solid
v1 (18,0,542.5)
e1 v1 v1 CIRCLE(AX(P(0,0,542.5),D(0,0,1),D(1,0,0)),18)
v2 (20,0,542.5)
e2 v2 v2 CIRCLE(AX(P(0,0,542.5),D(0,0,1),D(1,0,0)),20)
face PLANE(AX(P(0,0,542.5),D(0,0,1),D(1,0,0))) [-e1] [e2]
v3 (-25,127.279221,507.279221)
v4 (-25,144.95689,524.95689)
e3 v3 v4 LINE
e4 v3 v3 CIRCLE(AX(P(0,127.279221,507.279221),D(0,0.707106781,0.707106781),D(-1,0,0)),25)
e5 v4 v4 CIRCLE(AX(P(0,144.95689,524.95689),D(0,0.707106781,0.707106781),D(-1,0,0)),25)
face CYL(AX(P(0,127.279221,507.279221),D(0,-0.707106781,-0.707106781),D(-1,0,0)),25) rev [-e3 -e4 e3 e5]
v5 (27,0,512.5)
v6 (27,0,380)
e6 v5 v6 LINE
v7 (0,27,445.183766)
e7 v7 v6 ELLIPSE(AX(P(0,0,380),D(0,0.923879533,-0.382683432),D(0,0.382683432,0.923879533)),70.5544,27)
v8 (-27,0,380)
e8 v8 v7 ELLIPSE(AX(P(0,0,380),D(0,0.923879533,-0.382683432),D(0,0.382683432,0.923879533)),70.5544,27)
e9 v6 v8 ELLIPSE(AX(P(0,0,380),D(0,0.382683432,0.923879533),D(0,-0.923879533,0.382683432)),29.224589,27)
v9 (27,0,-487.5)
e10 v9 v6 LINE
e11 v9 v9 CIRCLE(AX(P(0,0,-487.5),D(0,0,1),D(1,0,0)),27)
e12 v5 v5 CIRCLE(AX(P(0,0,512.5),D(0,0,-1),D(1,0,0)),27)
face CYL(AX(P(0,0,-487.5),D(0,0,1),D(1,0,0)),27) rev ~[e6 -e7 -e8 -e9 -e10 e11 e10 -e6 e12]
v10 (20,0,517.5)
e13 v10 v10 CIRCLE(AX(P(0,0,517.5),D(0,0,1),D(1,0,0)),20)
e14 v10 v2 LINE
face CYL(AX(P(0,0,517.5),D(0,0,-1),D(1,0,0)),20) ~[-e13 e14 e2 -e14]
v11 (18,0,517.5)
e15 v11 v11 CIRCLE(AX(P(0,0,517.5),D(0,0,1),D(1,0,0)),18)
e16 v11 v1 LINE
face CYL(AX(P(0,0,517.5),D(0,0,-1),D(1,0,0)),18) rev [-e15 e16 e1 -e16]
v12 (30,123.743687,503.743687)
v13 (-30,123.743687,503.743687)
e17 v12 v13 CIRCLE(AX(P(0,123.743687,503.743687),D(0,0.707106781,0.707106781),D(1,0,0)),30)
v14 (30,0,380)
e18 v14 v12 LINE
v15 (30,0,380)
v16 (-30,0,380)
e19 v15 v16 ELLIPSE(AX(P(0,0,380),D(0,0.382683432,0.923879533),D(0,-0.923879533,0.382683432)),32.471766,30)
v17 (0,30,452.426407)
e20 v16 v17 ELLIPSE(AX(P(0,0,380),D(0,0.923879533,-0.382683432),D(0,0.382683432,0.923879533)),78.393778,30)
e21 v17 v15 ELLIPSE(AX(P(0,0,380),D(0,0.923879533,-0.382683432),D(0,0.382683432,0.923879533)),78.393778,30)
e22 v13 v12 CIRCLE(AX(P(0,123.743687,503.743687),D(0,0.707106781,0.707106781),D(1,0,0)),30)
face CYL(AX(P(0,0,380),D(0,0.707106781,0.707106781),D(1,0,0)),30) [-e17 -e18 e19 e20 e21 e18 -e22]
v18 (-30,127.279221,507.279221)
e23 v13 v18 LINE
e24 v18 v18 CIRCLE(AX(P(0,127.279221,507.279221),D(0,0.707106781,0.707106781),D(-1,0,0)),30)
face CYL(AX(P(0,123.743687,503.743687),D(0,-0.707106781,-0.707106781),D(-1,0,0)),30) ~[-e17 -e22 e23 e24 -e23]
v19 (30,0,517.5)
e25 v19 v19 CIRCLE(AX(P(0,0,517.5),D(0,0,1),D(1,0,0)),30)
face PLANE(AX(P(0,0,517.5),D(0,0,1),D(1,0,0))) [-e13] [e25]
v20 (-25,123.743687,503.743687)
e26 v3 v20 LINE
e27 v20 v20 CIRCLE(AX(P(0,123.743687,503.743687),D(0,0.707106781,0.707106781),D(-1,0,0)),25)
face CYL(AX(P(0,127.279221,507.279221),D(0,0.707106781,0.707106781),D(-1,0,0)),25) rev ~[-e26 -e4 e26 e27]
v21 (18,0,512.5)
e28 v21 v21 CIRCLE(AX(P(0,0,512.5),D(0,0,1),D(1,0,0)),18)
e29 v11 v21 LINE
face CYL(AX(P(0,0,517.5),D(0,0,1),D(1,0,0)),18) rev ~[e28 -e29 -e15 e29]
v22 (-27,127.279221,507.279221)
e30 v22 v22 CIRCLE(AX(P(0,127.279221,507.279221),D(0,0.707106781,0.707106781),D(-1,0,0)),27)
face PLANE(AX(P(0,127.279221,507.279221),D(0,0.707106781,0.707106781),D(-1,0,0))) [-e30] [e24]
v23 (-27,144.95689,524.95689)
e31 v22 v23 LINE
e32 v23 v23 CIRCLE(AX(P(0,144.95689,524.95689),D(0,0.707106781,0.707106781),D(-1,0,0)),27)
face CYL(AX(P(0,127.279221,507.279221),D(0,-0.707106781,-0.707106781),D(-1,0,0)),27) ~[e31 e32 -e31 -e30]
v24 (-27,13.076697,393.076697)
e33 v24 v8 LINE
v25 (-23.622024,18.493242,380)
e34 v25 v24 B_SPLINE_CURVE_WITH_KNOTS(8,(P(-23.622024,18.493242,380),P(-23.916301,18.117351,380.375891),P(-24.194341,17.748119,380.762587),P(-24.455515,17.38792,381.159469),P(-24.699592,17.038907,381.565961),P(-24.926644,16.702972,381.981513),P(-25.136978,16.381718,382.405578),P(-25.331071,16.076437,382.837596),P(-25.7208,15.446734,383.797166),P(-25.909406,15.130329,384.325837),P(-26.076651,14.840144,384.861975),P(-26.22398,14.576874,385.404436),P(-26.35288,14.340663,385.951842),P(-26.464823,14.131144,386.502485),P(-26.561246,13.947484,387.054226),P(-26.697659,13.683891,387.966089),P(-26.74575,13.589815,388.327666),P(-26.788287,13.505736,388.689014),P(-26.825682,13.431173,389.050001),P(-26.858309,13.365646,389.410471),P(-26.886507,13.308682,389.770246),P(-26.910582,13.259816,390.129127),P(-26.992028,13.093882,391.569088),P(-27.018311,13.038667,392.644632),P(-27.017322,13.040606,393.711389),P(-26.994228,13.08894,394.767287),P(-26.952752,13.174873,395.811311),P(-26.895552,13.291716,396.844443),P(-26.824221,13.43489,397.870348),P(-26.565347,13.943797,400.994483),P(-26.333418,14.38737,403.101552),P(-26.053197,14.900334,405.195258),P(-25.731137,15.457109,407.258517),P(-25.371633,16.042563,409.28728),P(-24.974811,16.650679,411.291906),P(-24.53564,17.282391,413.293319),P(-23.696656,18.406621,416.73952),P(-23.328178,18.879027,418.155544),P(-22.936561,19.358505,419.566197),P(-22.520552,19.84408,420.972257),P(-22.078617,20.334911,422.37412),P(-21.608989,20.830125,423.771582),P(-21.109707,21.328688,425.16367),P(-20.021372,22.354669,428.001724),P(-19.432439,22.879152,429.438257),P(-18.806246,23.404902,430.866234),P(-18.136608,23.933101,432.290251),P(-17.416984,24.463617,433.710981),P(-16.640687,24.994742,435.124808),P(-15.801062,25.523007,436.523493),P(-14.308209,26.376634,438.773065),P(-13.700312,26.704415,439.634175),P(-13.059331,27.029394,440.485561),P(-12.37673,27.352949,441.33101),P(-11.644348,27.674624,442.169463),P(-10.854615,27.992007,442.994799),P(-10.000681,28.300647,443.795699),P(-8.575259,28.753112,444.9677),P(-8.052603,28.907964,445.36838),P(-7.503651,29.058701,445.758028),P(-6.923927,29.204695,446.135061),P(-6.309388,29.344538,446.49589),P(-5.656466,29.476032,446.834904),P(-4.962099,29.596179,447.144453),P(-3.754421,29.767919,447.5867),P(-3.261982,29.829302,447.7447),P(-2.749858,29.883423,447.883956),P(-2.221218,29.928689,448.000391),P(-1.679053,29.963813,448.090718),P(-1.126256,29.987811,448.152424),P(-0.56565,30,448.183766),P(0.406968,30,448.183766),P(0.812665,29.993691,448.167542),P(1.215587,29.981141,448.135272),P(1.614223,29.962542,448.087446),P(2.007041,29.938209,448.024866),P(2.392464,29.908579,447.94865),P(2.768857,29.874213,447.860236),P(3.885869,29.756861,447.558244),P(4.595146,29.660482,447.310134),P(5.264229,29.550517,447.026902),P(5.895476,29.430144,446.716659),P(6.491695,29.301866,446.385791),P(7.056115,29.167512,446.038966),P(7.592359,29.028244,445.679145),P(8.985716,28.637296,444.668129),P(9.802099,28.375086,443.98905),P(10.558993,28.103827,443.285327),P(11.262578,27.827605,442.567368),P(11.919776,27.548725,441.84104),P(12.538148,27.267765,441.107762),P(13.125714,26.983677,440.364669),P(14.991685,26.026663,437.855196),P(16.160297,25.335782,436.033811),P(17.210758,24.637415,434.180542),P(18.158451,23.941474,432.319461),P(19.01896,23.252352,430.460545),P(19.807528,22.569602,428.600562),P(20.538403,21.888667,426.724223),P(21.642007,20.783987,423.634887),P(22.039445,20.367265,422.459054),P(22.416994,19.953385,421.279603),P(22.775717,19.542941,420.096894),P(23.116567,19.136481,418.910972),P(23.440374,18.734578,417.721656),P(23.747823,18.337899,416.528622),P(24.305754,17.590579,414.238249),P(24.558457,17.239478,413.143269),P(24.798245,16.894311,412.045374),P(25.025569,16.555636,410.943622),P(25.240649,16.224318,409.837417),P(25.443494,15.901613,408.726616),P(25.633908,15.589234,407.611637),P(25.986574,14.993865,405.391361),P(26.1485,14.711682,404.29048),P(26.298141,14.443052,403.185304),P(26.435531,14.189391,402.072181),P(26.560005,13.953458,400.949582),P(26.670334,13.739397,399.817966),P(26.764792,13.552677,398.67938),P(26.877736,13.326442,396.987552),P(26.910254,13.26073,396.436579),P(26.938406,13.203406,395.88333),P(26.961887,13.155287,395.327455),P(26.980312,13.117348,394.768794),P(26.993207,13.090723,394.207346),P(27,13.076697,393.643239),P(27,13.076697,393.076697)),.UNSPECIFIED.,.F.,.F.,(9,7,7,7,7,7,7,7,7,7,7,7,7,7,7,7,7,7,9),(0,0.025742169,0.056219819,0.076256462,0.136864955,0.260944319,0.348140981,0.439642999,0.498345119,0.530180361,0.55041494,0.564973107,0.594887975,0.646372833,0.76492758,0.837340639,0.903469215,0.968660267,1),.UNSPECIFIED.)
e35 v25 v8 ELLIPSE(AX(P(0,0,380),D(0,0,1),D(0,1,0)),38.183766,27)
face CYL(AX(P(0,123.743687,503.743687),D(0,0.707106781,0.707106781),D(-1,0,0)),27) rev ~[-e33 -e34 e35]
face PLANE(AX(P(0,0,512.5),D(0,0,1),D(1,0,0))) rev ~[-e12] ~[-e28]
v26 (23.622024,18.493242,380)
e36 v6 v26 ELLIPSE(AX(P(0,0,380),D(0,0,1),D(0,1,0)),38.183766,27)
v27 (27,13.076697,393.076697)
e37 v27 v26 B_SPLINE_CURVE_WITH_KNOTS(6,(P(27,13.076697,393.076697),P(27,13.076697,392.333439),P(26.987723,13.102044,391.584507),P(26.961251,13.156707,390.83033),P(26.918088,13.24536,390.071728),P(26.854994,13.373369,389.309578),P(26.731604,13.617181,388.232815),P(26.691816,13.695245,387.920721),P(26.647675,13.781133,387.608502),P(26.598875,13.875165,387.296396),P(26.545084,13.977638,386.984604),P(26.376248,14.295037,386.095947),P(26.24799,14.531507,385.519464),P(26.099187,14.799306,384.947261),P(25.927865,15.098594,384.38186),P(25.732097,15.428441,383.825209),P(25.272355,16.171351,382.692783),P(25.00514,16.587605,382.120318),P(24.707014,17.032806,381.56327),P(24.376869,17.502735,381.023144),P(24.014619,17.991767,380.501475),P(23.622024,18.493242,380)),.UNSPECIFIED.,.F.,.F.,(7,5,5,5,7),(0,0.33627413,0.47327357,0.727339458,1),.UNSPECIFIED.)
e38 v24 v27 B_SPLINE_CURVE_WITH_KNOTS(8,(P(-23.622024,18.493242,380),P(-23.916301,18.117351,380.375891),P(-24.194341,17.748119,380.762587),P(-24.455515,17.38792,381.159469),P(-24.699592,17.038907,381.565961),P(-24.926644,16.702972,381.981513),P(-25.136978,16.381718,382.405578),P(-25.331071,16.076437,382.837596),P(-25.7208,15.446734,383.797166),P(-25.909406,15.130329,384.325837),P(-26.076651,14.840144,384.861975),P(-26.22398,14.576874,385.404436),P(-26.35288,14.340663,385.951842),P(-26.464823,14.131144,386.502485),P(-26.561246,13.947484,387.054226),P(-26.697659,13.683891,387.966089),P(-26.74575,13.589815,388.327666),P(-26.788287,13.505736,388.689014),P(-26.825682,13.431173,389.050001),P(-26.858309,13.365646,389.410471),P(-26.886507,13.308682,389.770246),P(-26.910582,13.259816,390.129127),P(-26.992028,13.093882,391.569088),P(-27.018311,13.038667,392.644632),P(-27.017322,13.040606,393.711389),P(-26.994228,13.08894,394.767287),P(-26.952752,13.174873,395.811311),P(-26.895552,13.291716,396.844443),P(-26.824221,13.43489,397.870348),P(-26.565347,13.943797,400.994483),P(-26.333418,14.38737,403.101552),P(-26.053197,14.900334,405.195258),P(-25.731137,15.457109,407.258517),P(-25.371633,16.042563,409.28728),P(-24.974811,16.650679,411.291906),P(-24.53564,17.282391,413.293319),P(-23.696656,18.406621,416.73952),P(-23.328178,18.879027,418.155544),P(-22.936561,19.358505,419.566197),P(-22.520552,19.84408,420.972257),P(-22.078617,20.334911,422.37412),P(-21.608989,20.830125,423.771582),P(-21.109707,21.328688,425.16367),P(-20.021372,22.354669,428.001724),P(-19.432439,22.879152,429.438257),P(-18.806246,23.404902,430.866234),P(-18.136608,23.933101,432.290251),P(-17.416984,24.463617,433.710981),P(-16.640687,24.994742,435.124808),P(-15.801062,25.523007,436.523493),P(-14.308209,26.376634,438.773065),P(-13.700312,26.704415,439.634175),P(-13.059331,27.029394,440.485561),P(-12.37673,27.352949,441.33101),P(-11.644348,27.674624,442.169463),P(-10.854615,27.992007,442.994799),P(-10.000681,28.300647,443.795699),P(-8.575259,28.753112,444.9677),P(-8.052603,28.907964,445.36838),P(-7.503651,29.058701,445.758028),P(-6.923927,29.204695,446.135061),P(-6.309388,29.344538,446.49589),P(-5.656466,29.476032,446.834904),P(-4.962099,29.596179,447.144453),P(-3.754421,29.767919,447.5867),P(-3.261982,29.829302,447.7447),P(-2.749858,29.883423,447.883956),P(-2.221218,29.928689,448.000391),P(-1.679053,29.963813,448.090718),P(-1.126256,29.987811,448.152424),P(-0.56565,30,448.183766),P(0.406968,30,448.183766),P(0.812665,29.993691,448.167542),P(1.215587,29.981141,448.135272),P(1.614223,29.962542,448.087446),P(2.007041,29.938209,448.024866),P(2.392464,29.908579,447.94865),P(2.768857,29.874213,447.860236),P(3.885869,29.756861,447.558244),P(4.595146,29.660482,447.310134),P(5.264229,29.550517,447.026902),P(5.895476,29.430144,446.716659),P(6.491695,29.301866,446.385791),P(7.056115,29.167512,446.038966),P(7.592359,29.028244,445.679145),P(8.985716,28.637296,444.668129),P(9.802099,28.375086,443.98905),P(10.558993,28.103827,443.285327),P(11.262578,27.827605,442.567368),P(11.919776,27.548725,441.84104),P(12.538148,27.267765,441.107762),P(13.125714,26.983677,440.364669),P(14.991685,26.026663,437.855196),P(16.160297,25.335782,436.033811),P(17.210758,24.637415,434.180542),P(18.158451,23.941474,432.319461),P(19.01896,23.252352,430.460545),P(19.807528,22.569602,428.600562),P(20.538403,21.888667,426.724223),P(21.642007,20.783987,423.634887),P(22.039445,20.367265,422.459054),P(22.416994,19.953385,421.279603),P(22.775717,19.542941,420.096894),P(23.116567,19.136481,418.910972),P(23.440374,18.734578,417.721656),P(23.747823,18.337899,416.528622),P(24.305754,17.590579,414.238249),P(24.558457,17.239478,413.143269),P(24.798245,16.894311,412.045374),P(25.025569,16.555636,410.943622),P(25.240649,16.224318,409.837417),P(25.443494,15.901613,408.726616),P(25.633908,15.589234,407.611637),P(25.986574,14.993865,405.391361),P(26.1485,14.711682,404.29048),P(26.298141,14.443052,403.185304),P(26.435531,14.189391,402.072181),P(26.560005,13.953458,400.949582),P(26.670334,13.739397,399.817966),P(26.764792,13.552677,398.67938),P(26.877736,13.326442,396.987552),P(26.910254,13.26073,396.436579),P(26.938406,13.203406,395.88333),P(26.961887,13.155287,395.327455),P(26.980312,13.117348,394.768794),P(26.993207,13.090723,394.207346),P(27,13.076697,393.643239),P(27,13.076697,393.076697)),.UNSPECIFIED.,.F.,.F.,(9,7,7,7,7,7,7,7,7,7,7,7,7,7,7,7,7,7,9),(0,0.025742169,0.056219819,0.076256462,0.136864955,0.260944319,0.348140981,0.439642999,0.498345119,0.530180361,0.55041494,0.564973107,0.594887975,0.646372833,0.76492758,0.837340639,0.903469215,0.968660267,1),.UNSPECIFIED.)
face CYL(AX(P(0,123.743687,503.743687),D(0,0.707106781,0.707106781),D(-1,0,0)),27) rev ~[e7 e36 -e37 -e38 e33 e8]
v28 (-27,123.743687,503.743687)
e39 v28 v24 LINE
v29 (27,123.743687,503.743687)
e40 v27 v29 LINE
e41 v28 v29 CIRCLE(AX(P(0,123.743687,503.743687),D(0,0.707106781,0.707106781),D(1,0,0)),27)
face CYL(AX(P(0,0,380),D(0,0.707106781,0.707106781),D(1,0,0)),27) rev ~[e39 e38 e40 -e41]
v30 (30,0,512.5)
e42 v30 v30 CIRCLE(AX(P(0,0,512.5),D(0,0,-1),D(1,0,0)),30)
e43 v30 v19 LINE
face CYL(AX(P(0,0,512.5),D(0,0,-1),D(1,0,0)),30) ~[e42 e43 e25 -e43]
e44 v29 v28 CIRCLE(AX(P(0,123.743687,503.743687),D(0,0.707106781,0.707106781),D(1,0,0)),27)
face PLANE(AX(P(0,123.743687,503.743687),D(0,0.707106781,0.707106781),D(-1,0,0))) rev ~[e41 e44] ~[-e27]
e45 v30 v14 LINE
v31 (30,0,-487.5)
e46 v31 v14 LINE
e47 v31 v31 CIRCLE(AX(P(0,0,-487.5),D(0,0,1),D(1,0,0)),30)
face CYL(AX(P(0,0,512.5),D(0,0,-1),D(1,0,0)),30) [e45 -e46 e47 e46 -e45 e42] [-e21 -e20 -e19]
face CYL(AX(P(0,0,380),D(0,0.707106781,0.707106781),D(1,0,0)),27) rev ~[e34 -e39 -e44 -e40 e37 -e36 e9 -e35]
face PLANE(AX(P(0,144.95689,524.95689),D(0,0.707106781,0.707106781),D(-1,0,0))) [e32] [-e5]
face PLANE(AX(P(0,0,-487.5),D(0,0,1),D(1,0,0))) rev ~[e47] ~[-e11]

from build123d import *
from build123d import SkipClean  # not in build123d's __all__

# Parameters (mm, degrees)
F3_R      = 30
F3_R_2    = 27
F5_R      = 30
F5_R_2    = 27
F7_R      = 27
F8_DEPTH  = 1000.001
F9_R      = 27
F10_REACH = 885.9968684831
F11_R     = 30
F11_R_2   = 27
F12_DEPTH = 5
F13_R     = 20
F13_R_2   = 18
F14_DEPTH = 25
F15_R     = 18
F16_DEPTH = 25
F17_R     = 30
F17_R_2   = 27
F18_DEPTH = 5
F19_R     = 27
F19_R_2   = 25
F20_DEPTH = 25
F21_R     = 25
F22_DEPTH = 25


with BuildPart() as f4:
    # F4: sweep along a path in F0
    with BuildLine(Plane.YZ) as f4_path:
        Line((0, -487.5), (0, 380))
        Line((0, 380), (123.7436867076, 503.7436867076))
    # F3 (on plane+point) → F4 (sweep)
    with BuildSketch(Plane.XY.offset(-487.5)):
        Circle(F3_R)
        Circle(F3_R_2, mode=Mode.SUBTRACT)
    sweep(path=f4_path.line, transition=Transition.RIGHT)

    # F6: sweep along a path in F0
    with BuildLine(Plane.YZ) as f6_path:
        Line((0, 512.5), (0, 380))
    # F5 (on plane+point) → F6 (sweep)
    with BuildSketch(Plane.XY.offset(380)):
        Circle(F5_R)
        Circle(F5_R_2, mode=Mode.SUBTRACT)
    sweep(path=f6_path.line)

    # F7 (on face) → F8 (cut, through all)
    with BuildSketch(Plane.XY.offset(512.5)):
        Circle(F7_R)
    extrude(amount=-F8_DEPTH, mode=Mode.SUBTRACT)

    f10_end = f4.faces().sort_by_distance((-27, 0, 12.5))[0]
    # F9 (on face) → F10 (cut, up to a face of the model that its end follows)
    with BuildSketch(Plane(origin=(0, 313.7436867076, 313.7436867076), x_dir=(-1, 0, 0), z_dir=(0, 0.7071067812, 0.7071067812))):
        with Locations((0, 268.7005768509)):
            Circle(F9_R)
    f10_long = extrude(amount=-F10_REACH, mode=Mode.PRIVATE)
    add(split(f10_long, bisect_by=f10_end, keep=Keep.TOP, mode=Mode.PRIVATE), mode=Mode.SUBTRACT)

    # F11 (on face) → F12 (join)
    with BuildSketch(Plane.XY.offset(512.5)):
        Circle(F11_R)
        Circle(F11_R_2, mode=Mode.SUBTRACT)
        Circle(F11_R_2)
    with SkipClean():  # cleaning this boolean's faces spoils the solid; the shape is the same uncleaned
        extrude(amount=F12_DEPTH)

    # F13 (on face) → F14 (join)
    with BuildSketch(Plane.XY.offset(517.5)):
        Circle(F13_R)
        Circle(F13_R_2, mode=Mode.SUBTRACT)
    extrude(amount=F14_DEPTH)

    # F15 (on face) → F16 (cut)
    with BuildSketch(Plane.XY.offset(517.5)):
        Circle(F15_R)
    extrude(amount=-F16_DEPTH, mode=Mode.SUBTRACT)

    # F17 (on face) → F18 (join)
    with BuildSketch(Plane(origin=(0, 313.7436867076, 313.7436867076), x_dir=(-1, 0, 0), z_dir=(0, 0.7071067812, 0.7071067812))):
        with Locations((0, 268.7005768509)):
            Circle(F17_R)
        with Locations((0, 268.7005768509)):
            Circle(F17_R_2, mode=Mode.SUBTRACT)
        with Locations((0, 268.7005768509)):
            Circle(F17_R_2)
    extrude(amount=F18_DEPTH)

    # F19 (on face) → F20 (join)
    with BuildSketch(Plane(origin=(0, 317.2792206136, 317.2792206136), x_dir=(-1, 0, 0), z_dir=(0, 0.7071067812, 0.7071067812))):
        with Locations((0, 268.7005768509)):
            Circle(F19_R)
        with Locations((0, 268.7005768509)):
            Circle(F19_R_2, mode=Mode.SUBTRACT)
    extrude(amount=F20_DEPTH)

    # F21 (on face) → F22 (cut)
    with BuildSketch(Plane(origin=(0, 317.2792206136, 317.2792206136), x_dir=(-1, 0, 0), z_dir=(0, 0.7071067812, 0.7071067812))):
        with Locations((0, 268.7005768509)):
            Circle(F21_R)
    extrude(amount=-F22_DEPTH, mode=Mode.SUBTRACT)


solid = f4.part
